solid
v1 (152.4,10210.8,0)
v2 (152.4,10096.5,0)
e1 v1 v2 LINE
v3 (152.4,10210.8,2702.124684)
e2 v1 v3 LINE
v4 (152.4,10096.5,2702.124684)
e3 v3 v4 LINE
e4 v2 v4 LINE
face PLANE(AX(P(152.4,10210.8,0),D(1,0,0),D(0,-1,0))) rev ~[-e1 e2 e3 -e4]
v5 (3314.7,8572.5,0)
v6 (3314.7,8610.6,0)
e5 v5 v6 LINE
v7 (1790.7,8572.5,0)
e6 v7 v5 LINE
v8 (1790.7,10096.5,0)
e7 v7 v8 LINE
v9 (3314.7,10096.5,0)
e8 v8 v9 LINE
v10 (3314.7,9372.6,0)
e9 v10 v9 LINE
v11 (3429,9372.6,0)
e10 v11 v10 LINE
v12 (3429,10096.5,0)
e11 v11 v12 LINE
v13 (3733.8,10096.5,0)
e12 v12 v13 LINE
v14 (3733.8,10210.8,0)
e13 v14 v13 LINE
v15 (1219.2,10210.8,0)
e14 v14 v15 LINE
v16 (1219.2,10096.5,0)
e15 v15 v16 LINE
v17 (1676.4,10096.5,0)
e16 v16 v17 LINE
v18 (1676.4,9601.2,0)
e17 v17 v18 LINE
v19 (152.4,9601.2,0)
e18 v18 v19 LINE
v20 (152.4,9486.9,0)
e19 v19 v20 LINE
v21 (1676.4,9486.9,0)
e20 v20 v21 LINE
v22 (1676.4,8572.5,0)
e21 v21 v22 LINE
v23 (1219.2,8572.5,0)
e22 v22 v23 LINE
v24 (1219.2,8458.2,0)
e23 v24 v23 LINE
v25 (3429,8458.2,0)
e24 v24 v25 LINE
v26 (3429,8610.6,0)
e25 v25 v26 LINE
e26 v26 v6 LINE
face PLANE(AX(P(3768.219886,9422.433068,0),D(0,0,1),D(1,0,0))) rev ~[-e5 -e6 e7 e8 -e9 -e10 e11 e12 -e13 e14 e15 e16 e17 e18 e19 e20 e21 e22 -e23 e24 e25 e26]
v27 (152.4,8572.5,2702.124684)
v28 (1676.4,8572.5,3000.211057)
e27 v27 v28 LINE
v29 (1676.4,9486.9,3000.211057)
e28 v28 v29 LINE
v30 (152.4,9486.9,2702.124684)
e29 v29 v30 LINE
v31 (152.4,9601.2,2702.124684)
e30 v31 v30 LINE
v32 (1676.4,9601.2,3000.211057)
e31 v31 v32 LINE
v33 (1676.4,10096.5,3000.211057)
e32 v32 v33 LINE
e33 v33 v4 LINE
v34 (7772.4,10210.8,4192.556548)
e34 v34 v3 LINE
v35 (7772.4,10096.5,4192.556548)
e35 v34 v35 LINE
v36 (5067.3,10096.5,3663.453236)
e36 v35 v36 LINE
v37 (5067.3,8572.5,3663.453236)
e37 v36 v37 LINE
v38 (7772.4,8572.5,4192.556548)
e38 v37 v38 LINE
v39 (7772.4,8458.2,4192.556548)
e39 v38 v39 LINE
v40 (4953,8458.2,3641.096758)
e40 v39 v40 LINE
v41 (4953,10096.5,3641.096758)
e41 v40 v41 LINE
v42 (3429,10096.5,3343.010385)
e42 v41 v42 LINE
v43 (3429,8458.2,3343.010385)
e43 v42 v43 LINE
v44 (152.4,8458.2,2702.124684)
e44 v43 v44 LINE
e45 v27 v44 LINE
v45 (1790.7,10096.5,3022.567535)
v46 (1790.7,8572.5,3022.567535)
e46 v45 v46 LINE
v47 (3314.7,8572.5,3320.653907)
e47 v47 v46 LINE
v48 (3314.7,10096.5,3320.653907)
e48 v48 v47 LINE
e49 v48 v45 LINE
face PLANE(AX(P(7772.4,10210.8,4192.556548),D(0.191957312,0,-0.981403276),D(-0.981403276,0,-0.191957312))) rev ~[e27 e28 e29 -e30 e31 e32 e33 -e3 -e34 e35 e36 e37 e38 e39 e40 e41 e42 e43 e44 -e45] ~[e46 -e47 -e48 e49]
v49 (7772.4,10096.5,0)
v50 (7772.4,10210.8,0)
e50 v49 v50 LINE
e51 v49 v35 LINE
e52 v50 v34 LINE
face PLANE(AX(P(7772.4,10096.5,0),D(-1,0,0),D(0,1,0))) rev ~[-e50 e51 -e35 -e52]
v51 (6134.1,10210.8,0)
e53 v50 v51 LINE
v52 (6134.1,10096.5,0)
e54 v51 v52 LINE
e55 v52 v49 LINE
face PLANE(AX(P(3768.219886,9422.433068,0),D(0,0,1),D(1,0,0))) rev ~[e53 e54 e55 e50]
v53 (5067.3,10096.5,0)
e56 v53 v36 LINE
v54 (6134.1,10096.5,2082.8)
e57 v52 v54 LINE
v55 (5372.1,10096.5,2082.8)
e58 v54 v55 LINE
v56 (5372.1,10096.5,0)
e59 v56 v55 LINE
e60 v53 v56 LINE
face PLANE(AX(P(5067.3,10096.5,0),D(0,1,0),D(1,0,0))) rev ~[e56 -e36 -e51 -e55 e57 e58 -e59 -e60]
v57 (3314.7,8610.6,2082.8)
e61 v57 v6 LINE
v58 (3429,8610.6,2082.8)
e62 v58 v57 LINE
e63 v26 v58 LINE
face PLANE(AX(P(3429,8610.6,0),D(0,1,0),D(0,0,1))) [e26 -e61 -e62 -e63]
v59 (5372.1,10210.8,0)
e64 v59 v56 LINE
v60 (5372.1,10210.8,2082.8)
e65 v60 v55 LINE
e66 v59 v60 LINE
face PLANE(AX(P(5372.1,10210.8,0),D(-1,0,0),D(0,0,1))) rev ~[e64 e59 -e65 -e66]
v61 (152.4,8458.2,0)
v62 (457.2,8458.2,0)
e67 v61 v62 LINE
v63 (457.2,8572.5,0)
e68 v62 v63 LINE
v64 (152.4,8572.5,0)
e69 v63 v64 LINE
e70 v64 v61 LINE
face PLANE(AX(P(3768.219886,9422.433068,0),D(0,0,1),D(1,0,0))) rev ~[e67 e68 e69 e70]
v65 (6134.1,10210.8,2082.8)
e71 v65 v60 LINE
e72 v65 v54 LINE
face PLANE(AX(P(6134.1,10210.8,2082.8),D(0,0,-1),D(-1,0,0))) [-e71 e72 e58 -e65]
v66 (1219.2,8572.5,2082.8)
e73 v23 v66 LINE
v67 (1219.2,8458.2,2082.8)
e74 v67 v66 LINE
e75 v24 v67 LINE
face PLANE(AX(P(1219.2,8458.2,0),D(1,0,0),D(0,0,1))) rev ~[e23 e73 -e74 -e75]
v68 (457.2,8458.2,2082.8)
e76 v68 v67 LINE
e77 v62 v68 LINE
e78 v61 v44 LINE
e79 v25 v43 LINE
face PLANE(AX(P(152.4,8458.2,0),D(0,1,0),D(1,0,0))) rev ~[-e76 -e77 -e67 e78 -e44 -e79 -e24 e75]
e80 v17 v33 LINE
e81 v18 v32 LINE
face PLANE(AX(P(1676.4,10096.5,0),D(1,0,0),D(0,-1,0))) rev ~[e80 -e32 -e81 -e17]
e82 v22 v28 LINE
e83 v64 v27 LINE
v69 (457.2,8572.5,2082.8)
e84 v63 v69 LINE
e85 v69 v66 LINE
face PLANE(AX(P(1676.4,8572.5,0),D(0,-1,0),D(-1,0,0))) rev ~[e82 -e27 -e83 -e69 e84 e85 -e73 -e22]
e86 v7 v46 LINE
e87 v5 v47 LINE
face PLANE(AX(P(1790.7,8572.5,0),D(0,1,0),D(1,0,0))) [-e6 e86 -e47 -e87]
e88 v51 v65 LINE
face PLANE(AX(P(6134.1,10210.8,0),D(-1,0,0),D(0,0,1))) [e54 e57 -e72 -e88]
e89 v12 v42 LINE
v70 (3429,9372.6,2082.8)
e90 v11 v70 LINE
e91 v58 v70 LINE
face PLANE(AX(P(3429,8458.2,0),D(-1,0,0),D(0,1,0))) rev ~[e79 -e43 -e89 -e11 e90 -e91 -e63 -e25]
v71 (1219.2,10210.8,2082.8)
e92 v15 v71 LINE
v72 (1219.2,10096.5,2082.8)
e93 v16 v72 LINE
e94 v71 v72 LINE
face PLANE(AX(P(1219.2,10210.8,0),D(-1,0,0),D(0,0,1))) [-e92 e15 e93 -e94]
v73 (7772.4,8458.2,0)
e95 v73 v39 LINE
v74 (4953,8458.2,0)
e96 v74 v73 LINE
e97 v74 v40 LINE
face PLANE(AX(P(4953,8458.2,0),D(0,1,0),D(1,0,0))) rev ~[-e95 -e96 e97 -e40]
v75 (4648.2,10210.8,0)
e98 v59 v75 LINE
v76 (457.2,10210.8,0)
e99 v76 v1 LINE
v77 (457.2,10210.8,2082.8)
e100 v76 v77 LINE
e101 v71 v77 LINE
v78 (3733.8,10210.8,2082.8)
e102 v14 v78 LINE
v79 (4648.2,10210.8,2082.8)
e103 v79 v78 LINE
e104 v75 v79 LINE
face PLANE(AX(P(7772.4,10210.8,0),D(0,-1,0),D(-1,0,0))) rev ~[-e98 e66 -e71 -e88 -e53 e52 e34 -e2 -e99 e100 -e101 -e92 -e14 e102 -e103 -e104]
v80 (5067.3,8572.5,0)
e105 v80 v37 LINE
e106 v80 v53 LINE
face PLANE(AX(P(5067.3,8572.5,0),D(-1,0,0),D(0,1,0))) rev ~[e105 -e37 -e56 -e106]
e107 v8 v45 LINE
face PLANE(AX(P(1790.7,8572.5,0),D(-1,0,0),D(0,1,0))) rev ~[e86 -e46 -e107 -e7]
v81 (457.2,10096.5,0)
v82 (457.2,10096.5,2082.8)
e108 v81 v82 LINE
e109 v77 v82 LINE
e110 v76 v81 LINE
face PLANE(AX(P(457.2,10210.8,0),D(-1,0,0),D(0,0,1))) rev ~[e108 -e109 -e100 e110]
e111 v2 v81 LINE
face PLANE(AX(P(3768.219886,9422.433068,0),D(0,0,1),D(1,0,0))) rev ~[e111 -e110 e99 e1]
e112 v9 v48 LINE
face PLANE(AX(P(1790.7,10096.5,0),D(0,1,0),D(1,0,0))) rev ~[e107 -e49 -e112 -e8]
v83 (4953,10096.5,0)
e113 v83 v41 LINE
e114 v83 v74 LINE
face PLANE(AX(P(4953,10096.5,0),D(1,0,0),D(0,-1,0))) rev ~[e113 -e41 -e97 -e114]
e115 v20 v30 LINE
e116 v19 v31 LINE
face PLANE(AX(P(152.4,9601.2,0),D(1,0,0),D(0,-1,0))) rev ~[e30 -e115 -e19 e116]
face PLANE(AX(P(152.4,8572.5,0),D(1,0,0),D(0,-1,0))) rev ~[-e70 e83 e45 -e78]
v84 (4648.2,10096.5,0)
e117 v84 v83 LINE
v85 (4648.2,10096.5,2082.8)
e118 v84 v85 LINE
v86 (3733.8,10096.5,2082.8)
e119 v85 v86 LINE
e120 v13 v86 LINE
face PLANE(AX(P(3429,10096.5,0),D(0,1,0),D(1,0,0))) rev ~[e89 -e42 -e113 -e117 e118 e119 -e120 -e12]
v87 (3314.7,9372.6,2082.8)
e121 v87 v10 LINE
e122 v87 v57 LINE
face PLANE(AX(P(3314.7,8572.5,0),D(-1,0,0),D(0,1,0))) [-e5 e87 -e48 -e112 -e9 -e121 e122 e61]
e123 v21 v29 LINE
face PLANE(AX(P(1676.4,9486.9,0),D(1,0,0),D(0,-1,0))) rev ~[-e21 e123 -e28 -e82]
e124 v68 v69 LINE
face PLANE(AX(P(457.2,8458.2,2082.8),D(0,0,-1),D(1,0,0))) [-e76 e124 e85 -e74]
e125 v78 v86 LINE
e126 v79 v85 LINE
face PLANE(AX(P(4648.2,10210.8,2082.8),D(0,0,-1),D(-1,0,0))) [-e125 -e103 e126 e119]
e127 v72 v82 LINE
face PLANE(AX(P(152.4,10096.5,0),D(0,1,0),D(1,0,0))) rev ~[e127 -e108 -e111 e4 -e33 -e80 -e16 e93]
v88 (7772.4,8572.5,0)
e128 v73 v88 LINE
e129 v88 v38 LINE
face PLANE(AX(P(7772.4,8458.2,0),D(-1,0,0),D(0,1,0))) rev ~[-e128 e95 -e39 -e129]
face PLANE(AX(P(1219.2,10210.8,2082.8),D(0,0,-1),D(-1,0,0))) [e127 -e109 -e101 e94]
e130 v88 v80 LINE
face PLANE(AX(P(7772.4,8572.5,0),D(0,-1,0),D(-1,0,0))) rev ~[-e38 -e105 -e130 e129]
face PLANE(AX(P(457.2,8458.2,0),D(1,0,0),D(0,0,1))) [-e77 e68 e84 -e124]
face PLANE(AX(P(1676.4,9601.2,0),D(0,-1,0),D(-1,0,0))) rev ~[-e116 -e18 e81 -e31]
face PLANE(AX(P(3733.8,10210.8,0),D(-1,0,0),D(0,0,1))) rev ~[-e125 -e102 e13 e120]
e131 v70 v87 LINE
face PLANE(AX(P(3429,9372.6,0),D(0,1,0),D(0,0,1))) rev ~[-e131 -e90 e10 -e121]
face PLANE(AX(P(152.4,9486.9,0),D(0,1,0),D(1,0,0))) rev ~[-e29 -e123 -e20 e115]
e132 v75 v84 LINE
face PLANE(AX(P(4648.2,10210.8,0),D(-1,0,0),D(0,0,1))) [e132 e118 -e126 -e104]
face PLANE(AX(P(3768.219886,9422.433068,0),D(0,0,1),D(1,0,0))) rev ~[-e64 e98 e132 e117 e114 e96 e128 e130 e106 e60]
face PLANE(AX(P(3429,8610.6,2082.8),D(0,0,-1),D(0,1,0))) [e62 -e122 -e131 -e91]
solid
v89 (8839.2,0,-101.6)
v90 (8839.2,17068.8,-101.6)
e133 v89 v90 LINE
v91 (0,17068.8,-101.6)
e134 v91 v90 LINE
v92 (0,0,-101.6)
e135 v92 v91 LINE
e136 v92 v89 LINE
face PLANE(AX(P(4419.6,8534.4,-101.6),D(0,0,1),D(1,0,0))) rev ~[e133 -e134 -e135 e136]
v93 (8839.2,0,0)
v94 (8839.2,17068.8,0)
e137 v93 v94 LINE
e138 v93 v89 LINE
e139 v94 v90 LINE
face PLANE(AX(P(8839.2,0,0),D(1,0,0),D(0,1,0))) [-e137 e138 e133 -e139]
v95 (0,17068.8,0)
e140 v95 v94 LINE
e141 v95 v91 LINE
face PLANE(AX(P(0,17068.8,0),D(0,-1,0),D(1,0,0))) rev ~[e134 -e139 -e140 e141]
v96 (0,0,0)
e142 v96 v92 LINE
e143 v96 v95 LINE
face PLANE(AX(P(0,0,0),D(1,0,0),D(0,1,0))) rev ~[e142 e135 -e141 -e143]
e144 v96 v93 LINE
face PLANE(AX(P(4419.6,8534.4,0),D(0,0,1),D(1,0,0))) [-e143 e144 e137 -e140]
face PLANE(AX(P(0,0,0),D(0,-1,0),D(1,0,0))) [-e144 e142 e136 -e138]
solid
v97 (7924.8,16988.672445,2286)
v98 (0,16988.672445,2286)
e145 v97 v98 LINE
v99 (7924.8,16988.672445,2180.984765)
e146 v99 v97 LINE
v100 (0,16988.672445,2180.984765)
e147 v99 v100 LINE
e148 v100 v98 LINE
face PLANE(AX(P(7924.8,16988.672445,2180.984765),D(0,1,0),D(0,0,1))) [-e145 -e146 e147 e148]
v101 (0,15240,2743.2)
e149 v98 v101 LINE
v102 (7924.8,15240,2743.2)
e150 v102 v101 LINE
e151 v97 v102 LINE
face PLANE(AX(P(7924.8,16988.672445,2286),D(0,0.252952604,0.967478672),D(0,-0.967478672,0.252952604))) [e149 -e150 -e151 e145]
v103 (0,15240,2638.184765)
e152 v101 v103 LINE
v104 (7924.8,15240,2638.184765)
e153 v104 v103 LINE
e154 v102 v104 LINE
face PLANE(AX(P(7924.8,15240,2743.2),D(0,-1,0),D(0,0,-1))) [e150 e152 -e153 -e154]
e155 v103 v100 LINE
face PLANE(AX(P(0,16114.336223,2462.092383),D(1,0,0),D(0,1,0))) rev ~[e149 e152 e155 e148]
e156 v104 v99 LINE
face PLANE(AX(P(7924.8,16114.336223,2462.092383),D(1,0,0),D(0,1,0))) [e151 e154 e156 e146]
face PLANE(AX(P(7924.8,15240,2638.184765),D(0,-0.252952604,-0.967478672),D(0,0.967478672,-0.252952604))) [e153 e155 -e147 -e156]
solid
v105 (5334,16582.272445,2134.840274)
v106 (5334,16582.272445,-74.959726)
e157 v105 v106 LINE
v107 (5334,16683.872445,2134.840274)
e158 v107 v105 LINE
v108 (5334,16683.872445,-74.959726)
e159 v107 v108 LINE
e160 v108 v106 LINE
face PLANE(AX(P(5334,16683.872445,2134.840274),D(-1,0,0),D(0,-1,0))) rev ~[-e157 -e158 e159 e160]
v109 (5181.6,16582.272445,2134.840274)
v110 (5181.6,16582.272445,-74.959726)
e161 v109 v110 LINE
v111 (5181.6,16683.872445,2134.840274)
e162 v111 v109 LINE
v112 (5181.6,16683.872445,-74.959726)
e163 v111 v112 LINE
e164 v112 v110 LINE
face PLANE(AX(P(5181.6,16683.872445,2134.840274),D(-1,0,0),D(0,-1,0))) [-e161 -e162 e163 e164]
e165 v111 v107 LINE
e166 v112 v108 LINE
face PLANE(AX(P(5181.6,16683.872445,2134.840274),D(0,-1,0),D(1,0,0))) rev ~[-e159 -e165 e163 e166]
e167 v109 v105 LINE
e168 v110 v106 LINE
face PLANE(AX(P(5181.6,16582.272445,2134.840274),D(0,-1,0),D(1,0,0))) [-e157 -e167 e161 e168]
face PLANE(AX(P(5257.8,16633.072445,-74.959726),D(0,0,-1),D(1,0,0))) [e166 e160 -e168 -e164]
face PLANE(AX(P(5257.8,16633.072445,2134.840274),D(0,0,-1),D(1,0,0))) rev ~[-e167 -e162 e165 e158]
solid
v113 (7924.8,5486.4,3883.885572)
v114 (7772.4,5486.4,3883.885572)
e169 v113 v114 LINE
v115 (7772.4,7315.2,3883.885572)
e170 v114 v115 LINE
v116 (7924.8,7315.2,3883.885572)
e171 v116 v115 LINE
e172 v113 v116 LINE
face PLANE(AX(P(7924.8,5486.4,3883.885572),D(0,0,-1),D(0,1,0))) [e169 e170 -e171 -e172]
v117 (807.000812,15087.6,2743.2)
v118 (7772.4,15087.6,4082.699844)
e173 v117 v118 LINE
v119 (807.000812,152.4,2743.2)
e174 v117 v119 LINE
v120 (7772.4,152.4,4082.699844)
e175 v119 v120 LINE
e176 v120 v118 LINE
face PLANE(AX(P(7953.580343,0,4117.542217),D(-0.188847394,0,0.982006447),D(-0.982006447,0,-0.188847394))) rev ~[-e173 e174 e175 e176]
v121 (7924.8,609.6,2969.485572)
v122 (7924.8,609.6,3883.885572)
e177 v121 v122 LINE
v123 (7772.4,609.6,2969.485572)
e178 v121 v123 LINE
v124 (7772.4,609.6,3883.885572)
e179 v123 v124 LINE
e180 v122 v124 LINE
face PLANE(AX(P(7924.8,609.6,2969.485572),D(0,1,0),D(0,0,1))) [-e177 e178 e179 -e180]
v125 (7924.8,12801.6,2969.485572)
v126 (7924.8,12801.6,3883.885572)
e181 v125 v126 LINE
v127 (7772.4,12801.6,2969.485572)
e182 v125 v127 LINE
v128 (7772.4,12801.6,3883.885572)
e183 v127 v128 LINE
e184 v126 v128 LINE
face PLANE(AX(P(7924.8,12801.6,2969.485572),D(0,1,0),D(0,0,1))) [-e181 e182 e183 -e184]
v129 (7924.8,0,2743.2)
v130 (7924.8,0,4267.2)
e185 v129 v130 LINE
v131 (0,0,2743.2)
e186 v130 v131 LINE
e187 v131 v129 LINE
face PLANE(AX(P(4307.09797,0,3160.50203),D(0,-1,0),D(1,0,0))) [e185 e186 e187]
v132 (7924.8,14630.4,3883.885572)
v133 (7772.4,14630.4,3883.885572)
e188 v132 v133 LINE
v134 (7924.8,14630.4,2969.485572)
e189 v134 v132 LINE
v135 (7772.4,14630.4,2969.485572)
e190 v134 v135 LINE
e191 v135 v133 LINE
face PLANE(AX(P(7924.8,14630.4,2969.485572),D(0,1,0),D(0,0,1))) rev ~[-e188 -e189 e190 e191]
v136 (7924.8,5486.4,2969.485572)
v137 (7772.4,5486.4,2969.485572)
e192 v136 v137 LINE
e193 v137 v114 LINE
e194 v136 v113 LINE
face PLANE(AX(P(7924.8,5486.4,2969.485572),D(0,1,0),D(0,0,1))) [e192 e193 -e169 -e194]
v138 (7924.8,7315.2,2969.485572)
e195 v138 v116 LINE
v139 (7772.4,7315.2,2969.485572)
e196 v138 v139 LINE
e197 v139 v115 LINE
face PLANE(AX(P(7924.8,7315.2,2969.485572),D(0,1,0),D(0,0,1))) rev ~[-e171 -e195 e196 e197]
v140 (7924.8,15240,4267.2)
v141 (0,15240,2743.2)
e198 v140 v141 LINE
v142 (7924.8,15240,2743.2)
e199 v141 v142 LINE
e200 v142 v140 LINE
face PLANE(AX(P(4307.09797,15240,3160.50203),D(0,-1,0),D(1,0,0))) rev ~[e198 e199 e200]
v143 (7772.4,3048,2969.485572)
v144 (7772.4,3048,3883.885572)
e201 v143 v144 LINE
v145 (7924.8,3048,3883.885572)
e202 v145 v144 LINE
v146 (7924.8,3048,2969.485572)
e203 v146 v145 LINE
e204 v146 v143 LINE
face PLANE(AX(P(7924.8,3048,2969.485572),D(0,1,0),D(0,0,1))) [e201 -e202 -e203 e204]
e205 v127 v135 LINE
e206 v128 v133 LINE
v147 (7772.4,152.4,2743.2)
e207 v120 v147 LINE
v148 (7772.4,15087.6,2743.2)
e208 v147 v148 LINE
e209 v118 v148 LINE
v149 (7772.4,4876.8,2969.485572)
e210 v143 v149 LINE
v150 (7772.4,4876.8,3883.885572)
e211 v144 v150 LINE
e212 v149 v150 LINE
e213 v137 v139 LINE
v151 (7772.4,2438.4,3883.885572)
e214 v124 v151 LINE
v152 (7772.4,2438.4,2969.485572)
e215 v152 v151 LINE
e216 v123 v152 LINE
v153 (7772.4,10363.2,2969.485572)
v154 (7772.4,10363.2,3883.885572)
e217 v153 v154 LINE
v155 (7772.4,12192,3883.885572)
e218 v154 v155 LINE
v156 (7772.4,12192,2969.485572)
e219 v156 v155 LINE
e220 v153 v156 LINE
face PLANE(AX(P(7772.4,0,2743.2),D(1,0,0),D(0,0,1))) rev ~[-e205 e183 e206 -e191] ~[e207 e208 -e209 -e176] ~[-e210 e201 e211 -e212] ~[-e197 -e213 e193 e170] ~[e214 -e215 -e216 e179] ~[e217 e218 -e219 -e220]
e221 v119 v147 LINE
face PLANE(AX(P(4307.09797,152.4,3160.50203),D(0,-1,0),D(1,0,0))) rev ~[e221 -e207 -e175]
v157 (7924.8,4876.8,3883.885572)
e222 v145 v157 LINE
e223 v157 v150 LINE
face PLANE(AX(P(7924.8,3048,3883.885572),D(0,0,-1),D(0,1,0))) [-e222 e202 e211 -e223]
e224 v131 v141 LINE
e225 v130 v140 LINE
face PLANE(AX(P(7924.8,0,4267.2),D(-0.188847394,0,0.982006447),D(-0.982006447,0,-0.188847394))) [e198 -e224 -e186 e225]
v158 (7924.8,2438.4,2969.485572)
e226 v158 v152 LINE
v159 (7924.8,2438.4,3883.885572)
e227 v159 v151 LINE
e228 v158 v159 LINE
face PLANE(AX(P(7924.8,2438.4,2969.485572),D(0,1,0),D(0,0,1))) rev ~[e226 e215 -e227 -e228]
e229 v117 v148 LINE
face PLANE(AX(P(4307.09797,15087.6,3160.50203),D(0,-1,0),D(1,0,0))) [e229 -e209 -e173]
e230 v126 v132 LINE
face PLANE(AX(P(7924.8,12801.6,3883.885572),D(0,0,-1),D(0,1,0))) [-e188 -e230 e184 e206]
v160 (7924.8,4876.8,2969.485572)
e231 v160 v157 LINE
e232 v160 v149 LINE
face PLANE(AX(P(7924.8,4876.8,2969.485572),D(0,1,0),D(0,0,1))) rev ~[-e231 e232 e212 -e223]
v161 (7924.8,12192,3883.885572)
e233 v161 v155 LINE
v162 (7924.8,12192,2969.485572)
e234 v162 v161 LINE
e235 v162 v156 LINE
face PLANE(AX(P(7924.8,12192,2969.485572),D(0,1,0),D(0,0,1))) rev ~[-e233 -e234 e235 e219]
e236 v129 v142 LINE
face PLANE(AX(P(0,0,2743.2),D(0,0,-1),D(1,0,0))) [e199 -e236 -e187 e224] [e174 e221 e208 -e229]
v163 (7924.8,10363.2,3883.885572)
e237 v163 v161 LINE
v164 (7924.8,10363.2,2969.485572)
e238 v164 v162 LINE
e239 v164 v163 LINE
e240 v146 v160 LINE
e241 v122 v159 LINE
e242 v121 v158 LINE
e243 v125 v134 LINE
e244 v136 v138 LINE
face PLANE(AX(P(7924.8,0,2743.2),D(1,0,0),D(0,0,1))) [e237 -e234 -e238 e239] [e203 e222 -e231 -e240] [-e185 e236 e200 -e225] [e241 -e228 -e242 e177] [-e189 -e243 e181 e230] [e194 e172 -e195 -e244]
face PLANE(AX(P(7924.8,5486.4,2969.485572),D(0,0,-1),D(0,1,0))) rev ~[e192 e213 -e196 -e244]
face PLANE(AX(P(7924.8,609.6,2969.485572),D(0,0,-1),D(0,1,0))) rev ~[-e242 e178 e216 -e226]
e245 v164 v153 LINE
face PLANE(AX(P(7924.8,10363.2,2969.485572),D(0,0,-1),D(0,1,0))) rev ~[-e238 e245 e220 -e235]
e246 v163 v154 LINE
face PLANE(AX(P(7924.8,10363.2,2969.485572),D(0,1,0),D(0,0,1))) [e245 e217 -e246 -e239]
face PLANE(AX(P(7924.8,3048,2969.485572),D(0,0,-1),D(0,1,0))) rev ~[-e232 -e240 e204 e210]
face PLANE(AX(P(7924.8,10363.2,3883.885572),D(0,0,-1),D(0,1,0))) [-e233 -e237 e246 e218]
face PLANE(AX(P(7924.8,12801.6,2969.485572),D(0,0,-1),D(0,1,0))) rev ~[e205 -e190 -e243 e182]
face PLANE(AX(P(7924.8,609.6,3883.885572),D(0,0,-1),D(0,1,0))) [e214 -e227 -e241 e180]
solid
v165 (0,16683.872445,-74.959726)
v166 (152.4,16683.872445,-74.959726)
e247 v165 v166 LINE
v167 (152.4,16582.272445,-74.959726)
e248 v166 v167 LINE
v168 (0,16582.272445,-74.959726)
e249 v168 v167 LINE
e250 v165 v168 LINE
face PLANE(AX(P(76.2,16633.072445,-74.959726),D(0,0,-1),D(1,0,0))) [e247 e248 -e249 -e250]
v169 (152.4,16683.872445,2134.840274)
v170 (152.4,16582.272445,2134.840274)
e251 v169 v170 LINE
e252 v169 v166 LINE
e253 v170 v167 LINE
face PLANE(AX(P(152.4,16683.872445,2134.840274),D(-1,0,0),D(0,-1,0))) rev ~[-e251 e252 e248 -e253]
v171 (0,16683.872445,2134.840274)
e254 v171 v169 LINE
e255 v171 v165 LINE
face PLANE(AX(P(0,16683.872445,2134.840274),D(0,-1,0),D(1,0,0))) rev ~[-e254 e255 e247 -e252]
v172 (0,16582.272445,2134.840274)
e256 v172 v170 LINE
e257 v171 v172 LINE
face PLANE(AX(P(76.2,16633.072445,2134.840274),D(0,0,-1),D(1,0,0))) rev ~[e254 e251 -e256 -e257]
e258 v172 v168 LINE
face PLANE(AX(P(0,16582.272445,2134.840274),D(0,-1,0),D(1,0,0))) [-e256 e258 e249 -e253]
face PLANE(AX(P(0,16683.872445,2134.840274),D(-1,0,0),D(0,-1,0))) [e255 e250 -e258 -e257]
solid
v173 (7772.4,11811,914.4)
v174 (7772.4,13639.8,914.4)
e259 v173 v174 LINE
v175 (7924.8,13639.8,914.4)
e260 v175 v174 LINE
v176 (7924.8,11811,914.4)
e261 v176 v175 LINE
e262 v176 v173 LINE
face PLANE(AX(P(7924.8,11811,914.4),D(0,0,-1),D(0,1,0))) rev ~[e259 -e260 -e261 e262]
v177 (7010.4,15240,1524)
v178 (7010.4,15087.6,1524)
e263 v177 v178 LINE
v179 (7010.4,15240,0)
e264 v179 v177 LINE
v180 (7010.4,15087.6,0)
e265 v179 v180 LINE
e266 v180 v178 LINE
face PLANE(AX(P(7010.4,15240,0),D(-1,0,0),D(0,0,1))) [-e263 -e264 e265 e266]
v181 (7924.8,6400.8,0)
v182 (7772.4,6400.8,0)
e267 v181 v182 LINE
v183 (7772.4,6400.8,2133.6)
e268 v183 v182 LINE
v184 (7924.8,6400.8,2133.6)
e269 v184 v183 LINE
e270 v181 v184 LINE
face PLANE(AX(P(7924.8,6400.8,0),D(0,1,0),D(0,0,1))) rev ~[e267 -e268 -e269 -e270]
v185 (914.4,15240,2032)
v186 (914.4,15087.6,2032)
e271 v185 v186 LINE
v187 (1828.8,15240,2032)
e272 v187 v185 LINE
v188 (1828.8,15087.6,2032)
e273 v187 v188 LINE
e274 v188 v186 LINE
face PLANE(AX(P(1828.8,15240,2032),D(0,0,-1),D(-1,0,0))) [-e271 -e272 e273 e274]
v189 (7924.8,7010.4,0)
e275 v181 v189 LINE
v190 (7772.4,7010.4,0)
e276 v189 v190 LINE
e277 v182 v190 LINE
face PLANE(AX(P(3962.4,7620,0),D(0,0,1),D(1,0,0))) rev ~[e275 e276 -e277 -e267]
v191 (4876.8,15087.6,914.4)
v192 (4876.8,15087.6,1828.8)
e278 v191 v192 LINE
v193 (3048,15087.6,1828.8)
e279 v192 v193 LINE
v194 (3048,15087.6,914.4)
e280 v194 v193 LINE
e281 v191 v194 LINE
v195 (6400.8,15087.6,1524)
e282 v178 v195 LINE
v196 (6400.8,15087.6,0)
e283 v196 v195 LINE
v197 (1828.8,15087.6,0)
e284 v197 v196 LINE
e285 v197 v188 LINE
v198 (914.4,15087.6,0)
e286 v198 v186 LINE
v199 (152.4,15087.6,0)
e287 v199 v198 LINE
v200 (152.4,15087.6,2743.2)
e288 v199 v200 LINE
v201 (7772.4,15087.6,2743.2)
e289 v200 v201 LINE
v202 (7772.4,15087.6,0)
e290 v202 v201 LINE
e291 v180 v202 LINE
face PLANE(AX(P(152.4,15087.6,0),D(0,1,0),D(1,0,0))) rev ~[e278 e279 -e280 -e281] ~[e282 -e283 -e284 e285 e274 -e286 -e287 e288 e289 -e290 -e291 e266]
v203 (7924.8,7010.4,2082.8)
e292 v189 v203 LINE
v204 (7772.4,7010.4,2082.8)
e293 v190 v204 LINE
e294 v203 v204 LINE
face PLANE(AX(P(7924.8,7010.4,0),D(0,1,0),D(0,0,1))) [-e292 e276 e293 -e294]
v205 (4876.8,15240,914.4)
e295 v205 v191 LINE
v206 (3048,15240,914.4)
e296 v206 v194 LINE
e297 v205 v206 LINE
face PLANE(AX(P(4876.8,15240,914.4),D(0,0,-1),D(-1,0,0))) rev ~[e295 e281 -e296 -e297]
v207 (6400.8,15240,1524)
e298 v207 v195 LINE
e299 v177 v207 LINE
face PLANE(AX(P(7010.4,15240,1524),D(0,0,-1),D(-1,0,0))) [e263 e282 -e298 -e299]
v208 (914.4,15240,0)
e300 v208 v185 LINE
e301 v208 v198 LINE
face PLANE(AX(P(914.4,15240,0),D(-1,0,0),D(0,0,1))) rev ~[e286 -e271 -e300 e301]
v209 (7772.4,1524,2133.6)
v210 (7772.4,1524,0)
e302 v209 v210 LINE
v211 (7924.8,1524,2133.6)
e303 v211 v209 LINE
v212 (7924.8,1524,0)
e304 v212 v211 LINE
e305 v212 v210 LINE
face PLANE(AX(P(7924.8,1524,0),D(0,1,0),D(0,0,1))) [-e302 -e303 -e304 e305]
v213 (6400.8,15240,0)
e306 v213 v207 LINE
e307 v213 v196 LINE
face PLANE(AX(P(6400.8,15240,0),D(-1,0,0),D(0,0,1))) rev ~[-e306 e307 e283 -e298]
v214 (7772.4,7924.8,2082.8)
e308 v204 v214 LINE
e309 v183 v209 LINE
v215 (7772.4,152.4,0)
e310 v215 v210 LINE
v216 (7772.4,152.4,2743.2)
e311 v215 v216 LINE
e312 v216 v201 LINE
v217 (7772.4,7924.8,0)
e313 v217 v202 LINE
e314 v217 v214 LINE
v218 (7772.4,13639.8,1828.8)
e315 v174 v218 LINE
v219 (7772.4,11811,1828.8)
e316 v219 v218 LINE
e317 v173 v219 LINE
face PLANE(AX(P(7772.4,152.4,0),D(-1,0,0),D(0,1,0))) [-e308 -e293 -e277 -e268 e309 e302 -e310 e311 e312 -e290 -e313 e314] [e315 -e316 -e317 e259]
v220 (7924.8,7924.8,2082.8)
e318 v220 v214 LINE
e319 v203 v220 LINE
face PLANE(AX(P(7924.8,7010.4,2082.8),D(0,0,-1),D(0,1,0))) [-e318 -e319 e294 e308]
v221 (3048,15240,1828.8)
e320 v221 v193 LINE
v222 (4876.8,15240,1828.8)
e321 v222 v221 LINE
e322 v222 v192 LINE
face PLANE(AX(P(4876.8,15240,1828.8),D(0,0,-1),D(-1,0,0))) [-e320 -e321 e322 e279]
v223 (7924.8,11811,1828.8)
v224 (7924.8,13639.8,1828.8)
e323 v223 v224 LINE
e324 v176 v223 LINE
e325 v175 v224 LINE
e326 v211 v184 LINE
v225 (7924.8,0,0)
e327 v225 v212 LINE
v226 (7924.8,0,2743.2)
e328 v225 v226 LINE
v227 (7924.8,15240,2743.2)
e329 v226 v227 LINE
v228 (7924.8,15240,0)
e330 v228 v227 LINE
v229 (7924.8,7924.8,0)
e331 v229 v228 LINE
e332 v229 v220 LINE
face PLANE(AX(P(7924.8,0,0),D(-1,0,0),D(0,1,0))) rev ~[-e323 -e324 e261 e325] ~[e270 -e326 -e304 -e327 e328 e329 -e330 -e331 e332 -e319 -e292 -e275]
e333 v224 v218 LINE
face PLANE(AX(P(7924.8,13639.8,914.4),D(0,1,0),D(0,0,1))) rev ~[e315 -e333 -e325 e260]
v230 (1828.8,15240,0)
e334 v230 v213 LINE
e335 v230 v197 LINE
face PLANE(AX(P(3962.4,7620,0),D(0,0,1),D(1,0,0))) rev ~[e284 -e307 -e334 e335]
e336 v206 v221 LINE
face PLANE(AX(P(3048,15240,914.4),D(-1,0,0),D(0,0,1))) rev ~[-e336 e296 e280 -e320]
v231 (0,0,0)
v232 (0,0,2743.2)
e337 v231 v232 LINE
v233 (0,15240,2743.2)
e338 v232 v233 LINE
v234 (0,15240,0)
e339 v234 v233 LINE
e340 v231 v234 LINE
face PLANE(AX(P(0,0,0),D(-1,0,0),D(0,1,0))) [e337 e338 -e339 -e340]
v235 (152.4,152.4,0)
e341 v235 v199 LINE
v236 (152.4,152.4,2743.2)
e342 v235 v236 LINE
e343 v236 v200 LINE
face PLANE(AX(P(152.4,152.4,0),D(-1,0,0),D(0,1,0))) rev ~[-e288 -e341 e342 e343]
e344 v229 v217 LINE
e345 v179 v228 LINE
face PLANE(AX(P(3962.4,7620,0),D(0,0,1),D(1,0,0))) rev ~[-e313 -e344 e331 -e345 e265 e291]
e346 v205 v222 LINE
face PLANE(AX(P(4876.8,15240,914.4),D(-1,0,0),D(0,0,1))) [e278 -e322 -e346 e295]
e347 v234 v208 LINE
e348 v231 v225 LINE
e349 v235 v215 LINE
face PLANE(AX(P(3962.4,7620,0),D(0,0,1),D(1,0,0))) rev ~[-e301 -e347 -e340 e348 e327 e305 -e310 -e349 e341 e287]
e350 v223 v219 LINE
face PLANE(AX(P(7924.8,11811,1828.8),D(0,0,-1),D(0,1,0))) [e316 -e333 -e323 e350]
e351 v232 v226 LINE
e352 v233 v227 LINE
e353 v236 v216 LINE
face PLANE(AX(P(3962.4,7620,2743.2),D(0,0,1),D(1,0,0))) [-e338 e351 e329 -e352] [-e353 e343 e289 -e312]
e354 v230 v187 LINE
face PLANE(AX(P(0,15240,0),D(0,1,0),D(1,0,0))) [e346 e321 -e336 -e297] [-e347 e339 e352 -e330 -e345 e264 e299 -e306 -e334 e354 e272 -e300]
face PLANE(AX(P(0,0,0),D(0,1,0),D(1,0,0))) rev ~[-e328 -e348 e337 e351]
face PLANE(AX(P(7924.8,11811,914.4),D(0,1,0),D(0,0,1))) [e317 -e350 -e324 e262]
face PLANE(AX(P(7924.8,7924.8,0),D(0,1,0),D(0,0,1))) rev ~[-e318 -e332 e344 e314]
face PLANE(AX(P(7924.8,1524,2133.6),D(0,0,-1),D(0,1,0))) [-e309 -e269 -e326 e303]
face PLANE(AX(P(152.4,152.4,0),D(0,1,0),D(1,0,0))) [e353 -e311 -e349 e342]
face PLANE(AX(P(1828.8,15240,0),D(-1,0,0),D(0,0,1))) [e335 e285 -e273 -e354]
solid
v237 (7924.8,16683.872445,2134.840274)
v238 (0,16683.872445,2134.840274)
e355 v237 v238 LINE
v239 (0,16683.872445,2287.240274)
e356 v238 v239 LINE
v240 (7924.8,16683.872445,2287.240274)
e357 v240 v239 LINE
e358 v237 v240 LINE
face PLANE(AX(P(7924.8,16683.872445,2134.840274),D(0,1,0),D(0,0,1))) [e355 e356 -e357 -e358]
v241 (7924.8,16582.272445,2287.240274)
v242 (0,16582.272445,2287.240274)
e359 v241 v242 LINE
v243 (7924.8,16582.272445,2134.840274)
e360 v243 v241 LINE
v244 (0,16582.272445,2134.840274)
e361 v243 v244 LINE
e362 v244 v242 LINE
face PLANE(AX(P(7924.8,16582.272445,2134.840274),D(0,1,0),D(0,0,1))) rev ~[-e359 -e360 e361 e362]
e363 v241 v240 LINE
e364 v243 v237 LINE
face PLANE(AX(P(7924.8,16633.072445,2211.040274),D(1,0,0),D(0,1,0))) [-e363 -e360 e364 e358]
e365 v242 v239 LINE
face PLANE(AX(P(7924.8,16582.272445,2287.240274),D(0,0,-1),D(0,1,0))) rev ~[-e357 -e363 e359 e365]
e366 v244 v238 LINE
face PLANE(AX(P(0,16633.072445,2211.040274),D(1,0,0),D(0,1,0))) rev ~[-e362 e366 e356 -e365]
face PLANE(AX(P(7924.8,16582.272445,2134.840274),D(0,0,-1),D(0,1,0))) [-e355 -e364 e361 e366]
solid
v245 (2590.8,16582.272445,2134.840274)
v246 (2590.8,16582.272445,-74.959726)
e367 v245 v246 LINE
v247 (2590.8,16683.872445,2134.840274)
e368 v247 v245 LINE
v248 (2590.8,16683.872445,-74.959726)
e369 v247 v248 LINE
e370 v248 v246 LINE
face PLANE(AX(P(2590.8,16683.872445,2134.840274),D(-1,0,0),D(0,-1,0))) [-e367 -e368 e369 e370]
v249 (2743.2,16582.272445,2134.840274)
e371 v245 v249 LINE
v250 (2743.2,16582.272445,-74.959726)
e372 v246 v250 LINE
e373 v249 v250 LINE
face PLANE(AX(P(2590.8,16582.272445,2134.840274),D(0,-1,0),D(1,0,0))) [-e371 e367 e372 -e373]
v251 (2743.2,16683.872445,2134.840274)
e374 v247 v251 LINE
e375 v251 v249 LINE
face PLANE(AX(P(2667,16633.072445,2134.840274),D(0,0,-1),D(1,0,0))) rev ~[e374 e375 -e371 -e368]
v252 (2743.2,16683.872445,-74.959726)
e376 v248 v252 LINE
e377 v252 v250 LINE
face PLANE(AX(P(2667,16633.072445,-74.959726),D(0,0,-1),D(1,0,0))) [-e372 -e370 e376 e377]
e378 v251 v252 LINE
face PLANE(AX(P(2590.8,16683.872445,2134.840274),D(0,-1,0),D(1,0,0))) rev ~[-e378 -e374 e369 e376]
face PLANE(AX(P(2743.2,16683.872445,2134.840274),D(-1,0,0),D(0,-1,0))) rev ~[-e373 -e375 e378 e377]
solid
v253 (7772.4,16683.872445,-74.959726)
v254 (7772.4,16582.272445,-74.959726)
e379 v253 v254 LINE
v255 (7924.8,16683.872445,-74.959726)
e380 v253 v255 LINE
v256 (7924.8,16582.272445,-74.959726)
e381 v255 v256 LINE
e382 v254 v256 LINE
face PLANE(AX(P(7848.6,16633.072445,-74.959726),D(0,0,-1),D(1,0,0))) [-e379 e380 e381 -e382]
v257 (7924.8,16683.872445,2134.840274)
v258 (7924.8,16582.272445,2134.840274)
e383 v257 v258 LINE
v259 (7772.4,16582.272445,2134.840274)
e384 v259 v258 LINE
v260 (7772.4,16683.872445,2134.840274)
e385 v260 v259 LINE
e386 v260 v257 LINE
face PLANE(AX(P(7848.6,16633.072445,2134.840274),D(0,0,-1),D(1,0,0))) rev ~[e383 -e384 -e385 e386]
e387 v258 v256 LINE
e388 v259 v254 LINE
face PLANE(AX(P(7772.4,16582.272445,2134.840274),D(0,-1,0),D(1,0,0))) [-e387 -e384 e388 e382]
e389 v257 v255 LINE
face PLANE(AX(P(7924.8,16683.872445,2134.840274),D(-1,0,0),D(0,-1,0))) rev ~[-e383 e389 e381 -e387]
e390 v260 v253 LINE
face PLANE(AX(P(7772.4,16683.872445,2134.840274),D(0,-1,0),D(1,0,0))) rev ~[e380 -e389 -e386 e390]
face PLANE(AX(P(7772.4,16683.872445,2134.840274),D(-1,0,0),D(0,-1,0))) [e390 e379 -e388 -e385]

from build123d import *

# Parameters (mm, degrees)
F1_W      = 8839.2
F1_H      = 17068.8
F2_DEPTH  = 101.6
F0_W      = 7924.8
F0_H      = 15240
F0_W_2    = 7620
F0_H_2    = 14935.2
F3_DEPTH  = 2743.2
F5_DEPTH  = 15240
F6_W      = 4876.8
F6_H      = 2133.6
F7_DEPTH  = 304.8
F9_DEPTH  = 7924.8
F10_W     = 609.6
F10_H     = 1524
F10_W_2   = 1828.8
F10_H_2   = 914.4
F10_W_3   = 914.4
F10_H_3   = 2032
F11_DEPTH = 304.8
F12_T     = -152.4
F13_W     = 1828.8
F13_H     = 914.4
F14_DEPTH = 304.8
F15_W     = 101.6
F15_H     = 152.4
F16_DEPTH = 7924.8
F17_W     = 152.4
F17_H     = 101.6
F18_DEPTH = 2209.8
F19_W     = 1524
F19_H     = 1524
F20_DEPTH = 4267.2
F21_W     = 762
F21_H     = 2082.8
F22_DEPTH = 152.4
F23_W     = 762
F23_H     = 2082.8
F23_W_2   = 914.4
F24_DEPTH = 152.4
F25_W     = 1828.8
F25_H     = 914.4
F26_DEPTH = 152.4
F28_DEPTH = 1811.79238
F29_W     = 914.4
F29_H     = 2082.8
F30_DEPTH = 152.4
F31_W     = 762
F31_H     = 2082.8
F32_DEPTH = 152.4


# Not quite as in the source:
# - a feature names something its author has since deleted; it is built from what else it names


with BuildPart() as f2:
    # F1 (on Top) → F2 (new body)
    with BuildSketch(Plane.XY):
        with Locations((4419.6, 8534.4)):
            Rectangle(F1_W, F1_H)
    extrude(amount=-F2_DEPTH)


with BuildPart() as f3:
    # F0 (on Top) → F3 (new body)
    with BuildSketch(Plane.XY):
        with Locations((3962.4, 7620)):
            Rectangle(F0_W, F0_H)
        with Locations((3962.4, 7620)):
            Rectangle(F0_W_2, F0_H_2, mode=Mode.SUBTRACT)
    extrude(amount=F3_DEPTH)

    # F6 (on face) → F7 (cut)
    with BuildSketch(Plane.YZ.offset(7924.8)):
        with Locations((3962.4, 1066.8)):
            Rectangle(F6_W, F6_H)
    extrude(amount=-F7_DEPTH, mode=Mode.SUBTRACT)

    # F10 (on face) → F11 (cut)
    with BuildSketch(Plane(origin=(0, 15240, 0), x_dir=(-1, 0, 0), z_dir=(0, 1, 0))):
        with Locations((-6705.6, 762)):
            Rectangle(F10_W, F10_H)
        with Locations((-3962.4, 1371.6)):
            Rectangle(F10_W_2, F10_H_2)
        with Locations((-1371.6, 1016)):
            Rectangle(F10_W_3, F10_H_3)
    extrude(amount=-F11_DEPTH, mode=Mode.SUBTRACT)

    # F25 (on face) → F26 (cut)
    with BuildSketch(Plane.YZ.offset(7924.8)):
        with Locations((12725.4, 1371.6)):
            Rectangle(F25_W, F25_H)
    extrude(amount=-F26_DEPTH, mode=Mode.SUBTRACT)

    # F29 (on face) → F30 (cut)
    with BuildSketch(Plane.YZ.offset(7924.8)):
        with Locations((7467.6, 1041.4)):
            Rectangle(F29_W, F29_H)
    extrude(amount=-F30_DEPTH, mode=Mode.SUBTRACT)


with BuildPart() as f5:
    # F4 (on face) → F5 (new body)
    with BuildSketch(Plane.XZ):
        Polygon((7924.8, 4267.2), (0, 2743.2), (7924.8, 2743.2), align=None)
    extrude(amount=-F5_DEPTH)

    # F12
    f12_openings = [f5.faces().sort_by_distance(p)[0] for p in [
        (3962.4, 7620, 2743.2),
    ]]
    offset(amount=F12_T, openings=f12_openings)

    # F13 (on face) → F14 (cut)
    with BuildSketch(Plane.YZ.offset(7924.8)):
        with Locations((1524, 3426.6855716705)):
            Rectangle(F13_W, F13_H)
        with Locations((3962.4, 3426.6855716705)):
            Rectangle(F13_W, F13_H)
        with Locations((6400.8, 3426.6855716705)):
            Rectangle(F13_W, F13_H)
        with Locations((11277.6, 3426.6855716705)):
            Rectangle(F13_W, F13_H)
        with Locations((13716, 3426.6855716705)):
            Rectangle(F13_W, F13_H)
    extrude(amount=-F14_DEPTH, mode=Mode.SUBTRACT)


with BuildPart() as f9:
    # F8 (on face) → F9 (new body)
    with BuildSketch(Plane.YZ.offset(7924.8)):
        Polygon((16988.6724450765, 2286), (15240, 2743.2), (15240, 2638.1847650622), (16988.6724450765, 2180.9847650622), align=None)
    extrude(amount=-F9_DEPTH)


with BuildPart() as f16:
    # F15 (on face) → F16 (new body)
    with BuildSketch(Plane.YZ.offset(7924.8)):
        with Locations((16633.0724450765, 2211.0402736471)):
            Rectangle(F15_W, F15_H)
    extrude(amount=-F16_DEPTH)


with BuildPart() as f18:
    # F17 (on face) → F18 (new body)
    with BuildSketch(Plane(origin=(0, 0, 2134.8402736471), x_dir=(1, 0, 0), z_dir=(0, 0, -1))):
        with Locations((7848.6, -16633.0724450765)):
            Rectangle(F17_W, F17_H)
    extrude(amount=F18_DEPTH)


with BuildPart() as f18b:
    # F17 (on face) → F18, piece 2 (new body)
    with BuildSketch(Plane(origin=(0, 0, 2134.8402736471), x_dir=(1, 0, 0), z_dir=(0, 0, -1))):
        with Locations((5257.8, -16633.0724450765)):
            Rectangle(F17_W, F17_H)
    extrude(amount=F18_DEPTH)


with BuildPart() as f18c:
    # F17 (on face) → F18, piece 3 (new body)
    with BuildSketch(Plane(origin=(0, 0, 2134.8402736471), x_dir=(1, 0, 0), z_dir=(0, 0, -1))):
        with Locations((2667, -16633.0724450765)):
            Rectangle(F17_W, F17_H)
    extrude(amount=F18_DEPTH)


with BuildPart() as f18d:
    # F17 (on face) → F18, piece 4 (new body)
    with BuildSketch(Plane(origin=(0, 0, 2134.8402736471), x_dir=(1, 0, 0), z_dir=(0, 0, -1))):
        with Locations((76.2, -16633.0724450765)):
            Rectangle(F17_W, F17_H)
    extrude(amount=F18_DEPTH)


with BuildPart() as f20:
    # F19 (on Top) → F20 (new body)
    with BuildSketch(Plane.XY):
        Polygon((7772.4, 10210.8), (152.4, 10210.8), (152.4, 10096.5), (1676.4, 10096.5), (1676.4, 9601.2), (152.4, 9601.2), (152.4, 9486.9), (1676.4, 9486.9), (1676.4, 8572.5), (152.4, 8572.5), (152.4, 8458.2), (3429, 8458.2), (3429, 10096.5), (4953, 10096.5), (4953, 8458.2), (7772.4, 8458.2), (7772.4, 8572.5), (5067.3, 8572.5), (5067.3, 10096.5), (7772.4, 10096.5), align=None)
        with Locations((2552.7, 9334.5)):
            Rectangle(F19_W, F19_H, mode=Mode.SUBTRACT)
    extrude(amount=F20_DEPTH)

    # F21 (on face) → F22 (cut)
    with BuildSketch(Plane.XZ.offset(-8458.2)):
        with Locations((838.2, 1041.4)):
            Rectangle(F21_W, F21_H)
    extrude(amount=-F22_DEPTH, mode=Mode.SUBTRACT)

    # F23 (on face) → F24 (cut)
    with BuildSketch(Plane(origin=(0, 10210.8, 0), x_dir=(-1, 0, 0), z_dir=(0, 1, 0))):
        with Locations((-838.2, 1041.4)):
            Rectangle(F23_W, F23_H)
        with Locations((-4191, 1041.4)):
            Rectangle(F23_W_2, F23_H)
        with Locations((-5753.1, 1041.4)):
            Rectangle(F23_W, F23_H)
    extrude(amount=-F24_DEPTH, mode=Mode.SUBTRACT)

    # F27 (on face) → F28 (cut)
    with BuildSketch(Plane(origin=(0, 10210.8, 0), x_dir=(-1, 0, 0), z_dir=(0, 1, 0))):
        Polygon((-7772.4, 4267.2), (-7772.4, 4192.5565476095), (-152.4, 2702.1246839401), (-152.4, 4267.2), align=None)
    extrude(amount=-F28_DEPTH, mode=Mode.SUBTRACT)

    # F31 (on face) → F32 (cut)
    with BuildSketch(Plane.YZ.offset(3429)):
        with Locations((8991.6, 1041.4)):
            Rectangle(F31_W, F31_H)
    extrude(amount=-F32_DEPTH, mode=Mode.SUBTRACT)


solid = Compound([f2.part, f3.part, f5.part, f9.part, f16.part, f18.part, f18b.part, f18c.part, f18d.part, f20.part])
